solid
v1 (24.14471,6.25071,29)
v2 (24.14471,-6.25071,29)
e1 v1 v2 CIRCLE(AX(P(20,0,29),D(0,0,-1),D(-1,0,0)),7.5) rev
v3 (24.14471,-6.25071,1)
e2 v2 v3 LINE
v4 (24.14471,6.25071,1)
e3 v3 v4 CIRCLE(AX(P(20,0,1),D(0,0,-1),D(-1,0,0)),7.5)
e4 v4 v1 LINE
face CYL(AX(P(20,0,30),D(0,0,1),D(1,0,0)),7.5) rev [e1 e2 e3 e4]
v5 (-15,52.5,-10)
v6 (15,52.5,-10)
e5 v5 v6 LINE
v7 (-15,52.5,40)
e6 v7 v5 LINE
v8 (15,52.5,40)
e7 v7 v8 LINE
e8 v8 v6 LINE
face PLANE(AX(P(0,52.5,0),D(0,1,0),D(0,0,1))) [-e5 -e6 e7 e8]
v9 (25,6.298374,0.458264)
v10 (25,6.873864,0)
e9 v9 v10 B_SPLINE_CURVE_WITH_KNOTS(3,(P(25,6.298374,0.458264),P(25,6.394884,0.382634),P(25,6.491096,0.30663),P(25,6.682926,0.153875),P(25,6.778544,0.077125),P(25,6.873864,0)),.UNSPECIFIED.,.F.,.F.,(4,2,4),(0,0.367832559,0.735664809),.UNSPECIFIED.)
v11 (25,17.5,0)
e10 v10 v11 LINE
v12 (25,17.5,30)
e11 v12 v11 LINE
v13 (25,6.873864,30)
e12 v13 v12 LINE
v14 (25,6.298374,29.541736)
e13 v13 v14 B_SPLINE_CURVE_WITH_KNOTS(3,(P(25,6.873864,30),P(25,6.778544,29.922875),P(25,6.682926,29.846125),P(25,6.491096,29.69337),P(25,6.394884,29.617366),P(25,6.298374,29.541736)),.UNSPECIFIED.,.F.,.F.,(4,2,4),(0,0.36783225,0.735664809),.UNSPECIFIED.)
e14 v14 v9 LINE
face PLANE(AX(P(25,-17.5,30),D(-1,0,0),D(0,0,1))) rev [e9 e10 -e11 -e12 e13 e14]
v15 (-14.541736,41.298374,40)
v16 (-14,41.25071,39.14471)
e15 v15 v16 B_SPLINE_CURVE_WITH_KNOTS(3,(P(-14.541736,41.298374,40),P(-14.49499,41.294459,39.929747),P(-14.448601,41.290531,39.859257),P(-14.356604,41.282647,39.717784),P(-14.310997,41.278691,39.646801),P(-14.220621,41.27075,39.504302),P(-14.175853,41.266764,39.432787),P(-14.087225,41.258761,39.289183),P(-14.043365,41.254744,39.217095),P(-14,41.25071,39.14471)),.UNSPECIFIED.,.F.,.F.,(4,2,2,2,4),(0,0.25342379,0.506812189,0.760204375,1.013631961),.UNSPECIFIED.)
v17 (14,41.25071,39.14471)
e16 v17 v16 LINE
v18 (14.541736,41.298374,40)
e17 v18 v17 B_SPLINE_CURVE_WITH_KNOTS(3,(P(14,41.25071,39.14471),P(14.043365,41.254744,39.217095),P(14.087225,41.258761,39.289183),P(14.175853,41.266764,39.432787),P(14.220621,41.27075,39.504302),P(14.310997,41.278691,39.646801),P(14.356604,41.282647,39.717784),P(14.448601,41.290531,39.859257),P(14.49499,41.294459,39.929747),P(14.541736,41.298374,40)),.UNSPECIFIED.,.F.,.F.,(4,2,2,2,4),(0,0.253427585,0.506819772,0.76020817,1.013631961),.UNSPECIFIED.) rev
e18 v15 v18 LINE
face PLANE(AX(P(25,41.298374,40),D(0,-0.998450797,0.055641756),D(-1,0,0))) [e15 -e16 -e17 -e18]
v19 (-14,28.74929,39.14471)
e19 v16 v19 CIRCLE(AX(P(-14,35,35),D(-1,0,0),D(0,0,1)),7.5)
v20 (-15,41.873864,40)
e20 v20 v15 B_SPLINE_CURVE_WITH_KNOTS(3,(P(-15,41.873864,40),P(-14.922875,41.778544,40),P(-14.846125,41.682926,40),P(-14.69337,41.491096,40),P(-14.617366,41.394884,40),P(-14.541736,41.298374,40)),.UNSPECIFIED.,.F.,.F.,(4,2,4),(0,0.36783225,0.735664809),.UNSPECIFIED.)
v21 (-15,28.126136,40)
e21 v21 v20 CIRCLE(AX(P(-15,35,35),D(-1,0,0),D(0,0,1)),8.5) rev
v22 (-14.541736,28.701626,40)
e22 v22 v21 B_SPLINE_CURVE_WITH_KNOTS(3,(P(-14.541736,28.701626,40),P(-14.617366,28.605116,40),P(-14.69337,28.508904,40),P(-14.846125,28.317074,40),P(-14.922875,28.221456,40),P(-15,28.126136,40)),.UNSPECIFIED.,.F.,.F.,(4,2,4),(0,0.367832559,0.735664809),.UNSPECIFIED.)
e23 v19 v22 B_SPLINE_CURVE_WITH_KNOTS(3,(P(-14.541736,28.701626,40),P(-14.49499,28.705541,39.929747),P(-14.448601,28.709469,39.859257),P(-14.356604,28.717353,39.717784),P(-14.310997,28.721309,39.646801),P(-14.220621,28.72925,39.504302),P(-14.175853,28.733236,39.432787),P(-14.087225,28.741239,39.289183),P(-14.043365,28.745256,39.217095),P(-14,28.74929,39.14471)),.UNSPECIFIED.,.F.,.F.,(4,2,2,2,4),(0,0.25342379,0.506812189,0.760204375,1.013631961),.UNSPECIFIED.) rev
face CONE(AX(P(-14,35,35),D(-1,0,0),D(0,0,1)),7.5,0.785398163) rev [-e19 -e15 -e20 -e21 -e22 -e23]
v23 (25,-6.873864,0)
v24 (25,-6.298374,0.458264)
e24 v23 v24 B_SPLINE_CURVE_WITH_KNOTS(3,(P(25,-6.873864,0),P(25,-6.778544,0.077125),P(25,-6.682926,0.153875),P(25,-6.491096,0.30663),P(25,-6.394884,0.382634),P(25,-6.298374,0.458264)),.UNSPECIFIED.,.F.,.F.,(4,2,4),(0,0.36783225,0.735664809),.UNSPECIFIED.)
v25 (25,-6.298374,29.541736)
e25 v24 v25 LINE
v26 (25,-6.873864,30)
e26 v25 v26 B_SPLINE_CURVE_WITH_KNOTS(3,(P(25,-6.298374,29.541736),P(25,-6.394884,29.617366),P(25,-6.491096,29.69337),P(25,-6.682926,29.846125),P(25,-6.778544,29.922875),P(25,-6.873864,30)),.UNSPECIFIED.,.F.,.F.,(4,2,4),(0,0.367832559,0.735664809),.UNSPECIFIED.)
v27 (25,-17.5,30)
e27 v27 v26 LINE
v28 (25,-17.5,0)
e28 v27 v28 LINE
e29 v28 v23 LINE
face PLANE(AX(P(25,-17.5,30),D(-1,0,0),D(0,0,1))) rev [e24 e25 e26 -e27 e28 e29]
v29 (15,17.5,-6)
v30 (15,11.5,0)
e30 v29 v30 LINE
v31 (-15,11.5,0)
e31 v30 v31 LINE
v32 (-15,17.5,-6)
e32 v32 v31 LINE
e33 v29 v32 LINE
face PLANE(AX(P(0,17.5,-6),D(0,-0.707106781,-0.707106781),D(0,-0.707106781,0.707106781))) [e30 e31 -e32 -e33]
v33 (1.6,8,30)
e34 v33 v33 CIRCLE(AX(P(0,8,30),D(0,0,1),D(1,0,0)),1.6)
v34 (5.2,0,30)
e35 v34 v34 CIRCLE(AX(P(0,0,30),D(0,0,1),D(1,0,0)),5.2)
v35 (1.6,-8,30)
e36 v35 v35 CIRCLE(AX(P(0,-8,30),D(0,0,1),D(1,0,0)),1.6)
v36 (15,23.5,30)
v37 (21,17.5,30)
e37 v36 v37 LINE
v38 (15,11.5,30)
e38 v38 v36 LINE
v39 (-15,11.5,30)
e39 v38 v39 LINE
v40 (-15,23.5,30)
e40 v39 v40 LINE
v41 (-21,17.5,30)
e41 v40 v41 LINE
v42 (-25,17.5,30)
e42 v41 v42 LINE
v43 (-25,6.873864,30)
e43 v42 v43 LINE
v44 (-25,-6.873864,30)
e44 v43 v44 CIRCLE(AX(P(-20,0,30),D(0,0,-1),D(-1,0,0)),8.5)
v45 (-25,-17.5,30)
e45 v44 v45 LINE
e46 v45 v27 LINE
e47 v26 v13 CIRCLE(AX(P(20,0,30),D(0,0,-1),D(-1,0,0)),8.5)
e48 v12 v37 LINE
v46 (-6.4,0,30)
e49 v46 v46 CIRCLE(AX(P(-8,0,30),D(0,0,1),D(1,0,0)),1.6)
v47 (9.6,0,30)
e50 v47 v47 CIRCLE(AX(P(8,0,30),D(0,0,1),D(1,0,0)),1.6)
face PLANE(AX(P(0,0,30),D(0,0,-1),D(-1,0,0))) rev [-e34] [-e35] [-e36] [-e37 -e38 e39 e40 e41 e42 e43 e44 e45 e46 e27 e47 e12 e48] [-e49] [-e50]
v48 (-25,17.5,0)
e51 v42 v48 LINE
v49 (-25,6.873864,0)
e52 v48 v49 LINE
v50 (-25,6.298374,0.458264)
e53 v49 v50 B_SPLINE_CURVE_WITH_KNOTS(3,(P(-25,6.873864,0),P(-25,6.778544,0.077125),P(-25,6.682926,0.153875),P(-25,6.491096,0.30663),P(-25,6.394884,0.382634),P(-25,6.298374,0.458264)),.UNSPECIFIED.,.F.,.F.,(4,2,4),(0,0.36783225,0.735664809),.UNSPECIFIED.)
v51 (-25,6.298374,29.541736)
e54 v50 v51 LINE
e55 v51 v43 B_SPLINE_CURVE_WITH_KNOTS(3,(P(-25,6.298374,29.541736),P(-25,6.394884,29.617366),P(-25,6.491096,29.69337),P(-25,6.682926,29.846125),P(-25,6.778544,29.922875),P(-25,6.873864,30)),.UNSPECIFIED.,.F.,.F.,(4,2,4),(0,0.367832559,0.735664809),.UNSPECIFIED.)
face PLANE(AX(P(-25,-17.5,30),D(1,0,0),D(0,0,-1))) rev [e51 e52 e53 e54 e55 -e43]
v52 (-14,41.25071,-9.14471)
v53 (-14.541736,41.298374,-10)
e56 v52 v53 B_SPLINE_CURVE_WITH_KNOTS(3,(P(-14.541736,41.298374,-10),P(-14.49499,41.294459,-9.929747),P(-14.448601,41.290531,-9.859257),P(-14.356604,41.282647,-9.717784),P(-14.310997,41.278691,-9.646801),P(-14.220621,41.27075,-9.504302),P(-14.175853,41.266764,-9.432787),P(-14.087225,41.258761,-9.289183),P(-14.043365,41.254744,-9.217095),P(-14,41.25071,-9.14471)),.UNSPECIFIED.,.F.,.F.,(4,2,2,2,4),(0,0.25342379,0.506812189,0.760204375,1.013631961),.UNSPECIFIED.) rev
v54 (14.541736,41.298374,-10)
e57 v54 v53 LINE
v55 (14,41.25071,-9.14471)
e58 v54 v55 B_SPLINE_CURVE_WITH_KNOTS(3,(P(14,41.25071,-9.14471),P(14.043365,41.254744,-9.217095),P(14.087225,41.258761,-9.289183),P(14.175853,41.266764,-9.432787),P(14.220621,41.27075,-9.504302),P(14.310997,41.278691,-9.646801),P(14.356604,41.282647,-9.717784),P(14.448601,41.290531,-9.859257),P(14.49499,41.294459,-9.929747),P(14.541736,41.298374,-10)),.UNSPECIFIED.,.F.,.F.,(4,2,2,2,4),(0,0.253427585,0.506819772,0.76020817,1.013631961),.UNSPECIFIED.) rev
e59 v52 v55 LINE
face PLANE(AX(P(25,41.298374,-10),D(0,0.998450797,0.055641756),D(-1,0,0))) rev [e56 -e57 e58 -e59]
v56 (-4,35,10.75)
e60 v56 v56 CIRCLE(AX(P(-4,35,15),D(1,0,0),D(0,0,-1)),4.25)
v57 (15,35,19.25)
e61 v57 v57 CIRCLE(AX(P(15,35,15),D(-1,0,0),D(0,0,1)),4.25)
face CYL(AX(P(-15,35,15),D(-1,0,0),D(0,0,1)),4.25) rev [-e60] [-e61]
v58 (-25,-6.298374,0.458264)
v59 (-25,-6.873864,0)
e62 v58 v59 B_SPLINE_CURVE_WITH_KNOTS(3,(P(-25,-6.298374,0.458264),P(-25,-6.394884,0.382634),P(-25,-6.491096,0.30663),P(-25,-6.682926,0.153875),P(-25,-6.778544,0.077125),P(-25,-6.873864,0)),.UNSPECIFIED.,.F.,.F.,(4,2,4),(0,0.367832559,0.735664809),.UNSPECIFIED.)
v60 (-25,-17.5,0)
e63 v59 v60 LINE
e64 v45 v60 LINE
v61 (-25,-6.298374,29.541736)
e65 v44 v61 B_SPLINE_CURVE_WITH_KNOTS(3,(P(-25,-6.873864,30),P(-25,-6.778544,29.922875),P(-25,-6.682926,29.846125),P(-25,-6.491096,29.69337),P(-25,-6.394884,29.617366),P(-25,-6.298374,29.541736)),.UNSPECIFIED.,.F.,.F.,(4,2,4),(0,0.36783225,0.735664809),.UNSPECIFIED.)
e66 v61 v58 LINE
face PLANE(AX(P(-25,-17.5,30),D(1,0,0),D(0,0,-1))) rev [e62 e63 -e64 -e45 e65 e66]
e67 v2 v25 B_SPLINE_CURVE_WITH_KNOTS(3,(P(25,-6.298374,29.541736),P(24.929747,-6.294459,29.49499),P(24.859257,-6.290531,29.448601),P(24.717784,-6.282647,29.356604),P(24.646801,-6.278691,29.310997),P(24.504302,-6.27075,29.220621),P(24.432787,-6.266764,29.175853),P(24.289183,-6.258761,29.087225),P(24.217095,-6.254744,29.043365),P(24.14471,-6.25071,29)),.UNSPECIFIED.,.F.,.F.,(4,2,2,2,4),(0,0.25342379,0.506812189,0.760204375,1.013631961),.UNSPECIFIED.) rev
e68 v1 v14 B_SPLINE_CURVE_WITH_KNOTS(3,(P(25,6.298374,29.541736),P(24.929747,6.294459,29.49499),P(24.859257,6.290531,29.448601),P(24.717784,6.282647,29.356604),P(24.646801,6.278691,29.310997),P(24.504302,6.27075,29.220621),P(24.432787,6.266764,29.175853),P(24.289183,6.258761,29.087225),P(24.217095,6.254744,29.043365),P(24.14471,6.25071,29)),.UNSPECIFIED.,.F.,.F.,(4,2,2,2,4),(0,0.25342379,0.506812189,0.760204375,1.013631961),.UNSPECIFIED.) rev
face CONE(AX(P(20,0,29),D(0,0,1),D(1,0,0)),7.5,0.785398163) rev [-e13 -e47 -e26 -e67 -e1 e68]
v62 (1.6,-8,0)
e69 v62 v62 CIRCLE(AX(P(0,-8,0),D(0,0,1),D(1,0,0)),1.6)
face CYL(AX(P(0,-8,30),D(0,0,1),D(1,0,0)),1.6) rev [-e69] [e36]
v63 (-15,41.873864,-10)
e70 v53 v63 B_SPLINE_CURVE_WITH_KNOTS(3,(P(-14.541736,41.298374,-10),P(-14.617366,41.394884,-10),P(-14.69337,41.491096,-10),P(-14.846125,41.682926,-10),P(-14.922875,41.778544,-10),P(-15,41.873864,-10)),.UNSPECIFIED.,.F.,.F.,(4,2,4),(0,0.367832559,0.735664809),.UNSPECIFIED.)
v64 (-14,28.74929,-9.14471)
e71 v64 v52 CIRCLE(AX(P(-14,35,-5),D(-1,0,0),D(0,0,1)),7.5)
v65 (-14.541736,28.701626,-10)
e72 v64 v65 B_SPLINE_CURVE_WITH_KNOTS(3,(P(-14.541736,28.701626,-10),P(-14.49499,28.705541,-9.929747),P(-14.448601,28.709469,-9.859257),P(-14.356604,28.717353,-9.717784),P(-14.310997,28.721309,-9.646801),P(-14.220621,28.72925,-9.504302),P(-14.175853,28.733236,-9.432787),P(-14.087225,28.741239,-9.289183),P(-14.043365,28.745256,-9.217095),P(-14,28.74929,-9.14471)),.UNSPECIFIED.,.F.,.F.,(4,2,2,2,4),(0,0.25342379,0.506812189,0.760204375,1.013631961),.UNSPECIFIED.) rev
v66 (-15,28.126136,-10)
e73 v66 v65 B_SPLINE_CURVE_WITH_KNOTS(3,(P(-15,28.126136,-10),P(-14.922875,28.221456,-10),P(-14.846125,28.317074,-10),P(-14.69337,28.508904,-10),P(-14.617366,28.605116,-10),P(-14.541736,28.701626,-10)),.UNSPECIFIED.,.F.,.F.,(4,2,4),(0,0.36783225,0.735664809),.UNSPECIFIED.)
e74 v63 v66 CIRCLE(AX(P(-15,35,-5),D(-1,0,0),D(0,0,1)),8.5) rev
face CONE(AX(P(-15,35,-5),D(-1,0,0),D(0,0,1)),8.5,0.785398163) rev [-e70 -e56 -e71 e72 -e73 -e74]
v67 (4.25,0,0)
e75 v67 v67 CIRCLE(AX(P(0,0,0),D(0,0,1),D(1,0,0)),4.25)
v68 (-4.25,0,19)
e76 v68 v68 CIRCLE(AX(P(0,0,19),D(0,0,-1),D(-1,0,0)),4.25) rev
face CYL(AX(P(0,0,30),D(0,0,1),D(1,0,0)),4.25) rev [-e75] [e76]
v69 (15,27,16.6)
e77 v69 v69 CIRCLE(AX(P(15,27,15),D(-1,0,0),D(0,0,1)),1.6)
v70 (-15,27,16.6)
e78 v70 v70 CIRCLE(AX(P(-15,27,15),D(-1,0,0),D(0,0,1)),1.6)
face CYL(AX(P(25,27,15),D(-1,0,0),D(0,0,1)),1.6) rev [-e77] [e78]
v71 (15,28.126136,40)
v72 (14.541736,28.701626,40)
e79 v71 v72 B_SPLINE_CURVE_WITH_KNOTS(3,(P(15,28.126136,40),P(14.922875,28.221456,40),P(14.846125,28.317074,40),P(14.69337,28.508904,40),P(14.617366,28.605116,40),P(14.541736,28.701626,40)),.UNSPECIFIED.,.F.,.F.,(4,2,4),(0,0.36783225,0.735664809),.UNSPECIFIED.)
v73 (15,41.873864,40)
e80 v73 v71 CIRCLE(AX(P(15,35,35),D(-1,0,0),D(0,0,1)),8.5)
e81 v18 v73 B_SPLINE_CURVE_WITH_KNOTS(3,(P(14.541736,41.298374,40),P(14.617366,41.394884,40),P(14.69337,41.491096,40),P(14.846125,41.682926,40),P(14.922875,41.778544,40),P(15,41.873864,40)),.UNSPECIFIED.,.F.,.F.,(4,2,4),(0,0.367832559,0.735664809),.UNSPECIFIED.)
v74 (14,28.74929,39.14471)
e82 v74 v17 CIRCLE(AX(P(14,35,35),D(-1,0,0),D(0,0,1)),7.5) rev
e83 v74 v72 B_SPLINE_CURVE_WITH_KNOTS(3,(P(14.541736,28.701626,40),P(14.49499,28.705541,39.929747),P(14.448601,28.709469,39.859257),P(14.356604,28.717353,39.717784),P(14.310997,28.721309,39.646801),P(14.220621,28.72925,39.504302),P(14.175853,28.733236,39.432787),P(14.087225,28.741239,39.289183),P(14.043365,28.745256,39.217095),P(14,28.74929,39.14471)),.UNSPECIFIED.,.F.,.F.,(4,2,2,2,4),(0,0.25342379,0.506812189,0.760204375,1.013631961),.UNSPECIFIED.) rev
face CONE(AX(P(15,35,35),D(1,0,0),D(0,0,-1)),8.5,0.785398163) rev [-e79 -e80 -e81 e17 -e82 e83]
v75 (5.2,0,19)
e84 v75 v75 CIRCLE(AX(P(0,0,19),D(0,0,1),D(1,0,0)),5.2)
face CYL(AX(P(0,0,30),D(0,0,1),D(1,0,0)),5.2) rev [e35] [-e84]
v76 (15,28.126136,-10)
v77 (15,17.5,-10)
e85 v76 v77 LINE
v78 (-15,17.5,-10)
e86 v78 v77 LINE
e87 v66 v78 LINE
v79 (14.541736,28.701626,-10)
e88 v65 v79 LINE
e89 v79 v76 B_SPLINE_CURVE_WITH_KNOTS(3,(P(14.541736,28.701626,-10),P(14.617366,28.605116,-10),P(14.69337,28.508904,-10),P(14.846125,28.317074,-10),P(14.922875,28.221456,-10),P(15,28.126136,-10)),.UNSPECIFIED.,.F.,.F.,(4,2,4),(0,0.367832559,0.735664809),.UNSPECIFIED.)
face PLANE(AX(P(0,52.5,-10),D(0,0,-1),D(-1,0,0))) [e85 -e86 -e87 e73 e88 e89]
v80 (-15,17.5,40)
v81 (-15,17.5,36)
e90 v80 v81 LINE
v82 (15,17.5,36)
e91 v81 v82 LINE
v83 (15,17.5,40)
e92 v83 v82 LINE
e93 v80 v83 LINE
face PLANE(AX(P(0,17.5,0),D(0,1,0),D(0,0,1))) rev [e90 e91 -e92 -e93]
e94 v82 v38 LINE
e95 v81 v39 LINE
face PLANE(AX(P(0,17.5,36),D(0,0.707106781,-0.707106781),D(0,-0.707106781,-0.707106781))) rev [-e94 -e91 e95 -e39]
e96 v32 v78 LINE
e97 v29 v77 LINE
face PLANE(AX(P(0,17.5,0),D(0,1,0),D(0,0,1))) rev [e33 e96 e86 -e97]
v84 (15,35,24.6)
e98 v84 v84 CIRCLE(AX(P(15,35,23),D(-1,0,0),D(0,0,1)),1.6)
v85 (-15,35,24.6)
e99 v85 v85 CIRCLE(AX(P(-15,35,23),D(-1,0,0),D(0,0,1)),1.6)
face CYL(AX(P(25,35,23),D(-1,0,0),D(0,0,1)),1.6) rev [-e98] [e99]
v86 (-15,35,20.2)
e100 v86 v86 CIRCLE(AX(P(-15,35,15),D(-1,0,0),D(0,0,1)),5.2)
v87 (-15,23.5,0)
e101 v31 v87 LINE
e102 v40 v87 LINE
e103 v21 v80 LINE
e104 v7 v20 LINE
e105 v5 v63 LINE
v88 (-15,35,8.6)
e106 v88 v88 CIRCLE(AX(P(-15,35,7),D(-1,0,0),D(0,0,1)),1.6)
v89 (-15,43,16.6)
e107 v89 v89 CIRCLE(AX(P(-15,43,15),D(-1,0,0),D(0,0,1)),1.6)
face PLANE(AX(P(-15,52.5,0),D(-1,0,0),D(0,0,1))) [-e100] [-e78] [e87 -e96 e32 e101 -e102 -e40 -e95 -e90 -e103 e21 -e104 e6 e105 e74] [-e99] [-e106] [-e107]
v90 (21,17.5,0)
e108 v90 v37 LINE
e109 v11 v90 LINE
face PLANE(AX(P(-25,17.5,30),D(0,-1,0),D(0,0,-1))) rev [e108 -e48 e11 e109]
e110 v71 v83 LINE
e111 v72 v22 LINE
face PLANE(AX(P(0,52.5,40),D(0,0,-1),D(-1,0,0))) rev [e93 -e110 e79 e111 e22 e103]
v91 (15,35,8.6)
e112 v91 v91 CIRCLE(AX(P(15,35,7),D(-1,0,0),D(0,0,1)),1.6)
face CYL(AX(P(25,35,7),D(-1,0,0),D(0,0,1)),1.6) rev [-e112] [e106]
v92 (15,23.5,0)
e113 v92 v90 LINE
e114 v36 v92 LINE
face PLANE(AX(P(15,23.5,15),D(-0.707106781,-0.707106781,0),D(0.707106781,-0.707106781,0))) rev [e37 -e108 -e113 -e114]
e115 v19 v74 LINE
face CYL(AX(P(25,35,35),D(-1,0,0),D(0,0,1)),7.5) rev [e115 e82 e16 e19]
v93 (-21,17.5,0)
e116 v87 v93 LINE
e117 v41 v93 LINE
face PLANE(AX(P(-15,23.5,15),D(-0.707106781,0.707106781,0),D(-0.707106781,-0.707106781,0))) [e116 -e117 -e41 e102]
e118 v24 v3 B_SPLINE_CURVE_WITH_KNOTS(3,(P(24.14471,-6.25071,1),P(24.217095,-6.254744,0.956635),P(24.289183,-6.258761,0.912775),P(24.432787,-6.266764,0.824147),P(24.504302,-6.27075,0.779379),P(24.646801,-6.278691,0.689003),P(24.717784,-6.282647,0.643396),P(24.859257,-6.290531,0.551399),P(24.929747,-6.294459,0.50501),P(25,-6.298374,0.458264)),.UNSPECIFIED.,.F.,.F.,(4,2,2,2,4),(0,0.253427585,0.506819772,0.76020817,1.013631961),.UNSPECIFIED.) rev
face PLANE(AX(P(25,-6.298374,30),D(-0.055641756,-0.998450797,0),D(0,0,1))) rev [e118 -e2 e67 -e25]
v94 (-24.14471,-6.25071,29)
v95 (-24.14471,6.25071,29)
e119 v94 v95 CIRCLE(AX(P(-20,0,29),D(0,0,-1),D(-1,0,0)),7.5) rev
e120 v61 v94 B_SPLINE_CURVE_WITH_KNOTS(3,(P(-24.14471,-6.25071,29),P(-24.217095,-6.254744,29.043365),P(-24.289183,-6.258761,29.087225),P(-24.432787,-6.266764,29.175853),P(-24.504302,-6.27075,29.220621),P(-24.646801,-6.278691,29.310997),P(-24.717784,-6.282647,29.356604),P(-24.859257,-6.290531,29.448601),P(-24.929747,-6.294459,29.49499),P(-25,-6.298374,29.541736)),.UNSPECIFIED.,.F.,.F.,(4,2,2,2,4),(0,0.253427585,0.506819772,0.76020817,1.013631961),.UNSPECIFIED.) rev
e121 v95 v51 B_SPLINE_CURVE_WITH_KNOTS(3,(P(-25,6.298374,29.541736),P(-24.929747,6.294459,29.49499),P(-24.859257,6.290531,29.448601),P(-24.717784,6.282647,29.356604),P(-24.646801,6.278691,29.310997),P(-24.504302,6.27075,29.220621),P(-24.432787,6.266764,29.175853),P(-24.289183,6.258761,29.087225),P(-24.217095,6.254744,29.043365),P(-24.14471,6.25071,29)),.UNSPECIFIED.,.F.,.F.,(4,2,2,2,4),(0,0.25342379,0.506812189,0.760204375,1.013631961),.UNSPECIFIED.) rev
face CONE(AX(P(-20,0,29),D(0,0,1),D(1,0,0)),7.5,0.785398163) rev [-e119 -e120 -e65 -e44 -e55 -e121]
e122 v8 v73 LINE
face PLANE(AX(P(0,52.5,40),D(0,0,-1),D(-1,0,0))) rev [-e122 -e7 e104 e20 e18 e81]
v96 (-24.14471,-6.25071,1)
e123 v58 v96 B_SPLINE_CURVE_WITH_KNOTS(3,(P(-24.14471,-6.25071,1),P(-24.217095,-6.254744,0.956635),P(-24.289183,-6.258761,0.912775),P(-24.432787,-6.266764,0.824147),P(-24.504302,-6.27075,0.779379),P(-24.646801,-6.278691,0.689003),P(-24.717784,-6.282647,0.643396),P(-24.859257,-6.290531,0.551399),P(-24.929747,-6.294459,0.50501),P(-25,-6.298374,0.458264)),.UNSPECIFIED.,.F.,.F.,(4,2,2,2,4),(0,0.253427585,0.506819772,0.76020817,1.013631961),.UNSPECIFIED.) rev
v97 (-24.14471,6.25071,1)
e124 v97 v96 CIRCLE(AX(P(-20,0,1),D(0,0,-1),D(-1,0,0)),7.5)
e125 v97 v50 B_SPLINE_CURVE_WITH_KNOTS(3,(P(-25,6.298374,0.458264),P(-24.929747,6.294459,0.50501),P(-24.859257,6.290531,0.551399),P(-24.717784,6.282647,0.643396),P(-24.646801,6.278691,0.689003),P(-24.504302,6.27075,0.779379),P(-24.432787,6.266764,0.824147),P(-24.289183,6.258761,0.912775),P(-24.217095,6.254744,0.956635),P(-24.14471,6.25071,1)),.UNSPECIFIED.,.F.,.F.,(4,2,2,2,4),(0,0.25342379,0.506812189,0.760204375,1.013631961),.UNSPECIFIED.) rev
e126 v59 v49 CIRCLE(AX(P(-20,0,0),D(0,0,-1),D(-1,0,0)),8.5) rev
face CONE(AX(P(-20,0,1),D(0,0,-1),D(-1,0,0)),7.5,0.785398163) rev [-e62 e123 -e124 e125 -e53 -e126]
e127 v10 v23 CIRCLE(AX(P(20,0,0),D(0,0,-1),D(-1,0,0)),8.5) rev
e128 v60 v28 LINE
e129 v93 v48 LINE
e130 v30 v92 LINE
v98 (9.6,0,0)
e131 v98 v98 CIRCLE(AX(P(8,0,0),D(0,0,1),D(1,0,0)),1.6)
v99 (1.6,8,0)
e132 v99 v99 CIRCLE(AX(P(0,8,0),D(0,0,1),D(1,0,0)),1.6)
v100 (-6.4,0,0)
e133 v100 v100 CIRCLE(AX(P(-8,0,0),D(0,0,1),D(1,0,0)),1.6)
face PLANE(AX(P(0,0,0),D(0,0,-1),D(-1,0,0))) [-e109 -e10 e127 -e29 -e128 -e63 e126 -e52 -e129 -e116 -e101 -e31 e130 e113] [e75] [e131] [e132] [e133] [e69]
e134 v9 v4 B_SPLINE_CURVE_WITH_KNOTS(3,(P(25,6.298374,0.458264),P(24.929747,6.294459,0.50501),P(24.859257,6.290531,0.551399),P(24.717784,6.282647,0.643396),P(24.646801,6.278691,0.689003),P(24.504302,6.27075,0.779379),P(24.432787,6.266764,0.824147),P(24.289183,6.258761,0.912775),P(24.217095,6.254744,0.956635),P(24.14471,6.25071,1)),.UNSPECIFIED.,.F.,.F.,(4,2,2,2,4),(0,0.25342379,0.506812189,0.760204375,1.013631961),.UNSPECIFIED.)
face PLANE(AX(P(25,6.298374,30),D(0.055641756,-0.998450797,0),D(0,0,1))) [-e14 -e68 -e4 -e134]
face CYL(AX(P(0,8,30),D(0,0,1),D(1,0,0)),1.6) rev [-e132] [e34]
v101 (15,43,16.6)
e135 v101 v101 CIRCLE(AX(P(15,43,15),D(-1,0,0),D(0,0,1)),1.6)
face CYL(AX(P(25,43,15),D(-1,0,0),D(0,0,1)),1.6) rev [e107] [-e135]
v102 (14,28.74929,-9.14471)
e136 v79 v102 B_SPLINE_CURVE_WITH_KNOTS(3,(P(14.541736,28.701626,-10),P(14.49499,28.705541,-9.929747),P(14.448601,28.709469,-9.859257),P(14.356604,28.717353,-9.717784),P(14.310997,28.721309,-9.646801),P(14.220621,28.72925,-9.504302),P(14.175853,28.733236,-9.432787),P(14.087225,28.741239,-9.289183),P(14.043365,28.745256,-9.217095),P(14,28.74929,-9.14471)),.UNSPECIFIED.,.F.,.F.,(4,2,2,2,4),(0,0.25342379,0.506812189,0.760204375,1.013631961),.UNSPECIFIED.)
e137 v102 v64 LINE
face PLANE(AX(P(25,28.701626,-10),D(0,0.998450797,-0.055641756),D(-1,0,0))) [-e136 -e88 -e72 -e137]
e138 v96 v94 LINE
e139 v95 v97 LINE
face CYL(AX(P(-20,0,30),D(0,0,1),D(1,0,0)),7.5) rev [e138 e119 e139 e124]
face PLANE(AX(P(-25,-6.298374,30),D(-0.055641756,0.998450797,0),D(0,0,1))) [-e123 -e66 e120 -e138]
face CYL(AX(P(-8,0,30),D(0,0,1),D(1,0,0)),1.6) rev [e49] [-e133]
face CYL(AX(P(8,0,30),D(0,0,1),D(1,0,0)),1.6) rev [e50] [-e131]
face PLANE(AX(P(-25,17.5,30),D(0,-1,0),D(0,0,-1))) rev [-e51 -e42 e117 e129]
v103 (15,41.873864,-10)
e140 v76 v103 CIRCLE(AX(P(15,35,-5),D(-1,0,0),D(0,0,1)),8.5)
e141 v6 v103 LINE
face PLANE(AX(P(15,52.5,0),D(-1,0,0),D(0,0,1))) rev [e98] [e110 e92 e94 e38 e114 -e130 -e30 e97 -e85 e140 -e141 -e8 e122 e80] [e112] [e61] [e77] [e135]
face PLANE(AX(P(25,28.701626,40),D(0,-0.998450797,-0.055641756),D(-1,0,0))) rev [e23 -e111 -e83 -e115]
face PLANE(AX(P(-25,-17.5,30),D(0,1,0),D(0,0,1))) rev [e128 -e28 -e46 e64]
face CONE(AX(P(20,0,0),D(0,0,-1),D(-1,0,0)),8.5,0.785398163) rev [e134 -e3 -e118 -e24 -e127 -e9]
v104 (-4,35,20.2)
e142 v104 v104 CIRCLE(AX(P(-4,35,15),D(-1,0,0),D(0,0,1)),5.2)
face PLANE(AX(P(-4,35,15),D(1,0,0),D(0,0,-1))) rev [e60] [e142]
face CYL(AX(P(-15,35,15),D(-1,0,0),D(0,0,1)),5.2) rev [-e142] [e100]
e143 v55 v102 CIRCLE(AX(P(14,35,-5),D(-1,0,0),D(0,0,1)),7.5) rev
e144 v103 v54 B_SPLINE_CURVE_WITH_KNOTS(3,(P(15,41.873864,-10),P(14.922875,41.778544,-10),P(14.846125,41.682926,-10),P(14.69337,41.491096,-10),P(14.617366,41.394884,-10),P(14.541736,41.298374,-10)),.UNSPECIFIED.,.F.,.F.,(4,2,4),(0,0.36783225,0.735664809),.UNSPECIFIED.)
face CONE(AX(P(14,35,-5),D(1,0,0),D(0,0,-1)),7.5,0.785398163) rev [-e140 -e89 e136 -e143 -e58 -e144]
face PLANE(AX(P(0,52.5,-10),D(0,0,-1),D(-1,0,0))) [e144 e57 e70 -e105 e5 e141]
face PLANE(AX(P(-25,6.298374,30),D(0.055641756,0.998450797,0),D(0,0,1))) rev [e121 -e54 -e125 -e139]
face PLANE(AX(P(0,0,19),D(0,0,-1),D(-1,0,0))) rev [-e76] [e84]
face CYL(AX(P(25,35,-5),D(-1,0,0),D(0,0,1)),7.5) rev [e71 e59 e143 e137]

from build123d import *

# Parameters (mm, degrees)
SKETCH_1_W              = 50
SKETCH_1_H              = 35
EXTRUDE_1_DEPTH         = 30
HOLE_WIZARD_360_D       = 8.5
HOLE_WIZARD_465_D       = 3.2
HOLE_WIZARD_619_D       = 15
CHAMFER_1_SIZE          = 1
CHAMFER_1_SIZE_2        = 0.708203932
SKETCH_8_W              = 15
SKETCH_8_H              = 15
EXTRUDE_2_DEPTH         = 35
HOLE_WIZARD_1775_D      = 10.4
HOLE_WIZARD_1775_DEPTH  = 11
HOLE_WIZARD_1887_D      = 10.4
HOLE_WIZARD_1887_DEPTH  = 11
HOLE_WIZARD_2064_D      = 8.5
CUT_EXTRUDE_START       = -40
CUT_EXTRUDE_1_OUTLINE_R = 1.6
CUT_EXTRUDE_1_DEPTH     = 30
CHAMFER_2_SIZE          = 1
CHAMFER_2_SIZE_2        = 0.708203933
RIB_START               = -15
RIB_8_DEPTH             = 30
RIB_10_REACH            = 72.578
SKETCH_20_WALL_W        = 151.64122351
SKETCH_20_WALL_H        = 30


with BuildPart() as part:
    # 草图1 → 凸台-拉伸1 (new body)
    with BuildSketch(Plane.XY):
        Rectangle(SKETCH_1_W, SKETCH_1_H)
    extrude(amount=EXTRUDE_1_DEPTH)

    # Hole Wizard 360 (through all)
    with Locations(Plane.XY.offset(30)):
        with Locations((0, 0)):
            Hole(HOLE_WIZARD_360_D / 2)

    # Hole Wizard 465 (through all)
    with Locations(Plane.XY.offset(30)):
        with Locations((8, 0), (0, 8), (-8, 0), (0, -8)):
            Hole(HOLE_WIZARD_465_D / 2)

    # Hole Wizard 619 (through all)
    with Locations(Plane.XY.offset(30)):
        with Locations((20, 0), (-20, 0)):
            Hole(HOLE_WIZARD_619_D / 2)

    # 倒角1
    # the kernel refuses this chamfer: 1, 0.708203932 mm, written as the material it takes off along each edge
    with BuildSketch(Plane(origin=(-20, 0, 0), x_dir=(-0.8790200859122482, 0.4767847402789059, 0), z_dir=(-0.4767847402789059, -0.8790200859122482, 0))) as chamfer_1_piece_1:
        Polygon((7.5, -CHAMFER_1_SIZE), (7.5 + CHAMFER_1_SIZE, 0), (7.5, 0), align=None)
    revolve(axis=Axis((-20, 0, 0), (0, 0, -1)), revolution_arc=303.048763938, mode=Mode.SUBTRACT)
    with BuildSketch(Plane(origin=(-20, 0, 30), x_dir=(-0.879020085912248, 0.47678474027890627, 0), z_dir=(-0.47678474027890627, -0.879020085912248, 0))) as chamfer_1_piece_2:
        Polygon((7.5 + CHAMFER_1_SIZE, 0), (7.5, CHAMFER_1_SIZE), (7.5, 0), align=None)
    revolve(axis=Axis((-20, 0, 30), (0, 0, -1)), revolution_arc=303.048763938, mode=Mode.SUBTRACT)
    with BuildSketch(Plane(origin=(20, 0, 30), x_dir=(0.879020085912248, -0.4767847402789061, 0), z_dir=(0.4767847402789061, 0.879020085912248, 0))) as chamfer_1_piece_3:
        Polygon((7.5 + CHAMFER_1_SIZE, 0), (7.5, CHAMFER_1_SIZE), (7.5, 0), align=None)
    revolve(axis=Axis((20, 0, 30), (0, 0, -1)), revolution_arc=303.048763938, mode=Mode.SUBTRACT)
    with BuildSketch(Plane(origin=(20, 0, 0), x_dir=(0.8790200859122481, 0.476784740278906, 0), z_dir=(0.476784740278906, -0.8790200859122481, 0))) as chamfer_1_piece_4:
        Polygon((7.5, CHAMFER_1_SIZE), (7.5 + CHAMFER_1_SIZE, 0), (7.5, 0), align=None)
    revolve(axis=Axis((20, 0, 0), (0, 0, 1)), revolution_arc=303.048763938, mode=Mode.SUBTRACT)
    with BuildSketch(Plane(origin=(-25, 5.590169944, 32.778051389), x_dir=(0.7914486393779661, 0.611235675682274, 0), z_dir=(0, 0, -1)), Plane(origin=(25, -5.590169944, 32.778051389), x_dir=(-0.7914486393779661, -0.611235675682274, 0), z_dir=(0, 0, -1))) as chamfer_1_piece_5:
        with BuildLine():
            Line((1.080663788, 0), (CHAMFER_1_SIZE_2 * 0.611235676113, -CHAMFER_1_SIZE_2 * 0.791448639936))
            Line((CHAMFER_1_SIZE_2 * 0.611235676113, -CHAMFER_1_SIZE_2 * 0.791448639936), (0, 0))
            ThreePointArc((0, 0), (0.555522087, -0.019473843), (1.080663788, 0))
        make_face()
    extrude(amount=35.556102778, mode=Mode.SUBTRACT)
    with BuildSketch(Plane(origin=(-25, -5.590169944, 32.778051389), x_dir=(0.7914486393779665, -0.6112356756822735, 0), z_dir=(0, 0, -1))) as chamfer_1_piece_6:
        with BuildLine():
            Line((1.080663788, 0), (CHAMFER_1_SIZE_2 * 0.611235676113, CHAMFER_1_SIZE_2 * 0.791448639936))
            Line((CHAMFER_1_SIZE_2 * 0.611235676113, CHAMFER_1_SIZE_2 * 0.791448639936), (0, 0))
            ThreePointArc((0, 0), (0.555522087, 0.019473843), (1.080663788, 0))
        make_face()
    extrude(amount=35.556102778, mode=Mode.SUBTRACT)
    with BuildSketch(Plane(origin=(25, 5.590169944, 32.778051389), x_dir=(0, 1, 0), z_dir=(0, 0, -1))) as chamfer_1_piece_7:
        with BuildLine():
            Line((CHAMFER_1_SIZE_2, 0), (0.660540261, -0.855289885))
            ThreePointArc((0.660540261, -0.855289885), (0.354967464, -0.427764092), (0, 0))
            Line((0, 0), (CHAMFER_1_SIZE_2, 0))
        make_face()
    extrude(amount=35.556102778, mode=Mode.SUBTRACT)

    # 草图8 → 凸台-拉伸2 (add)
    with BuildSketch(Plane(origin=(0, 17.5, 0), x_dir=(1, 0, 0), z_dir=(0, 1, 0))):
        Polygon((15, -30), (0, -30), (-15, -30), (-15, -40), (15, -40), align=None)
        with Locations((-7.5, -22.5)):
            Rectangle(SKETCH_8_W, SKETCH_8_H)
        with Locations((-7.5, -7.5)):
            Rectangle(SKETCH_8_W, SKETCH_8_H)
        Polygon((-15, 0), (0, 0), (15, 0), (15, 10), (-15, 10), align=None)
        with Locations((7.5, -7.5)):
            Rectangle(SKETCH_8_W, SKETCH_8_H)
        with Locations((7.5, -22.5)):
            Rectangle(SKETCH_8_W, SKETCH_8_H)
    extrude(amount=EXTRUDE_2_DEPTH)

    # Hole Wizard 1775
    with Locations(Plane.XY.offset(30)):
        with Locations((0, 0)):
            Hole(HOLE_WIZARD_1775_D / 2, depth=HOLE_WIZARD_1775_DEPTH)

    # Hole Wizard 1887
    with Locations(Plane.ZY.offset(15)):
        with Locations((15, 35)):
            Hole(HOLE_WIZARD_1887_D / 2, depth=HOLE_WIZARD_1887_DEPTH)

    # Hole Wizard 2064 (through all)
    with Locations(Plane.ZY.offset(15)):
        with Locations((15, 35)):
            Hole(HOLE_WIZARD_2064_D / 2)

    # 切除-拉伸1: read off the stored shape, not the designer's step
    # 切除-拉伸1 outline → 切除-拉伸1 (cut)
    with BuildSketch(Plane.ZY.offset(25).offset(CUT_EXTRUDE_START)):
        with Locations((23, 35)):
            Circle(CUT_EXTRUDE_1_OUTLINE_R)
        with Locations((7, 35)):
            Circle(CUT_EXTRUDE_1_OUTLINE_R)
        with Locations((15, 43)):
            Circle(CUT_EXTRUDE_1_OUTLINE_R)
        with BuildLine():
            Line((40, 29.409830056), (40, 40.590169944))
            ThreePointArc((40, 40.590169944), (27.5, 35), (40, 29.409830056))
        make_face()
        with Locations((15, 27)):
            Circle(CUT_EXTRUDE_1_OUTLINE_R)
        with BuildLine():
            Line((-10, 40.590169944), (-10, 29.409830056))
            ThreePointArc((-10, 29.409830056), (2.5, 35), (-10, 40.590169944))
        make_face()
    extrude(amount=CUT_EXTRUDE_1_DEPTH, mode=Mode.SUBTRACT)

    # 倒角2
    # the kernel refuses this chamfer: 1, 0.708203933 mm, written as the material it takes off along each edge
    with BuildSketch(Plane(origin=(-15, 35, 35), x_dir=(0, 0.4767847403128172, 0.8790200858938546), z_dir=(0, -0.8790200858938546, 0.4767847403128172))) as chamfer_2_piece_1:
        Polygon((7.5 + CHAMFER_2_SIZE, 0), (7.5, -CHAMFER_2_SIZE), (7.5, 0), align=None)
    revolve(axis=Axis((-15, 35, 35), (-1, 0, 0)), revolution_arc=303.048763934, mode=Mode.SUBTRACT)
    with BuildSketch(Plane(origin=(-15, 35, -5), x_dir=(0, -0.4767847403128172, -0.8790200858938546), z_dir=(0, 0.8790200858938546, -0.4767847403128172))) as chamfer_2_piece_2:
        Polygon((7.5 + CHAMFER_2_SIZE, 0), (7.5, -CHAMFER_2_SIZE), (7.5, 0), align=None)
    revolve(axis=Axis((-15, 35, -5), (-1, 0, 0)), revolution_arc=303.048763934, mode=Mode.SUBTRACT)
    with BuildSketch(Plane(origin=(15, 35, -5), x_dir=(0, -0.4767847403128172, -0.8790200858938546), z_dir=(0, 0.8790200858938546, -0.4767847403128172))) as chamfer_2_piece_3:
        Polygon((7.5 + CHAMFER_2_SIZE, 0), (7.5, CHAMFER_2_SIZE), (7.5, 0), align=None)
    revolve(axis=Axis((15, 35, -5), (-1, 0, 0)), revolution_arc=303.048763934, mode=Mode.SUBTRACT)
    with BuildSketch(Plane(origin=(15, 35, 35), x_dir=(0, 0.4767847403128172, 0.8790200858938546), z_dir=(0, -0.8790200858938546, 0.4767847403128172))) as chamfer_2_piece_4:
        Polygon((7.5 + CHAMFER_2_SIZE, 0), (7.5, CHAMFER_2_SIZE), (7.5, 0), align=None)
    revolve(axis=Axis((15, 35, 35), (-1, 0, 0)), revolution_arc=303.048763934, mode=Mode.SUBTRACT)
    with BuildSketch(Plane(origin=(17.778051389, 40.590169944, -10), x_dir=(0, 0.6112356756567692, 0.7914486393976635), z_dir=(-1, 0, 0))) as chamfer_2_piece_5:
        with BuildLine():
            Line((1.080663788, 0), (CHAMFER_2_SIZE_2 * 0.611235675226, CHAMFER_2_SIZE_2 * 0.79144863884))
            Line((CHAMFER_2_SIZE_2 * 0.611235675226, CHAMFER_2_SIZE_2 * 0.79144863884), (0, 0))
            ThreePointArc((0, 0), (0.555522087, 0.019473843), (1.080663788, 0))
        make_face()
    extrude(amount=35.556102778, mode=Mode.SUBTRACT)
    with BuildSketch(Plane(origin=(17.778051389, 29.409830056, -10), x_dir=(0, -1, 0), z_dir=(-1, 0, 0)), Plane(origin=(17.778051389, 40.590169944, 40), x_dir=(0, 1, 0), z_dir=(-1, 0, 0))) as chamfer_2_piece_6:
        with BuildLine():
            Line((CHAMFER_2_SIZE_2, 0), (0.660540261, 0.855289885))
            ThreePointArc((0.660540261, 0.855289885), (0.354967464, 0.427764092), (0, 0))
            Line((0, 0), (CHAMFER_2_SIZE_2, 0))
        make_face()
    extrude(amount=35.556102778, mode=Mode.SUBTRACT)
    with BuildSketch(Plane(origin=(17.778051389, 29.409830056, 40), x_dir=(0, -1, 0), z_dir=(-1, 0, 0))) as chamfer_2_piece_7:
        with BuildLine():
            Line((CHAMFER_2_SIZE_2, 0), (0.660540261, -0.855289885))
            ThreePointArc((0.660540261, -0.855289885), (0.354967464, -0.427764092), (0, 0))
            Line((0, 0), (CHAMFER_2_SIZE_2, 0))
        make_face()
    extrude(amount=35.556102778, mode=Mode.SUBTRACT)

    # 筋8: read off the stored shape, not the designer's step
    # 筋8 outline → 筋8 (add)
    with BuildSketch(Plane.XY.offset(15).offset(RIB_START)):
        Polygon((21, 17.5), (15, 23.5), (15, 17.5), align=None)
    rib_8 = extrude(amount=RIB_8_DEPTH)

    # 镜向3: 筋8 across plane
    add(rib_8.mirror(Plane.ZY))

    # 草图20 wall → 筋10 (add, up to next)
    with BuildSketch(Plane(origin=(0, 14.5, 33), x_dir=(0, -0.707106781187, -0.707106781187), z_dir=(0, -0.707106781187, 0.707106781187)), mode=Mode.PRIVATE) as rib_10_sk1:
        Rectangle(SKETCH_20_WALL_W, SKETCH_20_WALL_H)
    rib_10_tool1 = extrude(rib_10_sk1.sketch, amount=-RIB_10_REACH, mode=Mode.PRIVATE) - part.part
    rib_10 = rib_10_tool1.solids().sort_by_distance((0, 14.5, 33))[0]
    add(rib_10)

    # 镜向4: 筋10 across plane
    add(rib_10.mirror(Plane.XY.offset(15)))


solid = part.part
